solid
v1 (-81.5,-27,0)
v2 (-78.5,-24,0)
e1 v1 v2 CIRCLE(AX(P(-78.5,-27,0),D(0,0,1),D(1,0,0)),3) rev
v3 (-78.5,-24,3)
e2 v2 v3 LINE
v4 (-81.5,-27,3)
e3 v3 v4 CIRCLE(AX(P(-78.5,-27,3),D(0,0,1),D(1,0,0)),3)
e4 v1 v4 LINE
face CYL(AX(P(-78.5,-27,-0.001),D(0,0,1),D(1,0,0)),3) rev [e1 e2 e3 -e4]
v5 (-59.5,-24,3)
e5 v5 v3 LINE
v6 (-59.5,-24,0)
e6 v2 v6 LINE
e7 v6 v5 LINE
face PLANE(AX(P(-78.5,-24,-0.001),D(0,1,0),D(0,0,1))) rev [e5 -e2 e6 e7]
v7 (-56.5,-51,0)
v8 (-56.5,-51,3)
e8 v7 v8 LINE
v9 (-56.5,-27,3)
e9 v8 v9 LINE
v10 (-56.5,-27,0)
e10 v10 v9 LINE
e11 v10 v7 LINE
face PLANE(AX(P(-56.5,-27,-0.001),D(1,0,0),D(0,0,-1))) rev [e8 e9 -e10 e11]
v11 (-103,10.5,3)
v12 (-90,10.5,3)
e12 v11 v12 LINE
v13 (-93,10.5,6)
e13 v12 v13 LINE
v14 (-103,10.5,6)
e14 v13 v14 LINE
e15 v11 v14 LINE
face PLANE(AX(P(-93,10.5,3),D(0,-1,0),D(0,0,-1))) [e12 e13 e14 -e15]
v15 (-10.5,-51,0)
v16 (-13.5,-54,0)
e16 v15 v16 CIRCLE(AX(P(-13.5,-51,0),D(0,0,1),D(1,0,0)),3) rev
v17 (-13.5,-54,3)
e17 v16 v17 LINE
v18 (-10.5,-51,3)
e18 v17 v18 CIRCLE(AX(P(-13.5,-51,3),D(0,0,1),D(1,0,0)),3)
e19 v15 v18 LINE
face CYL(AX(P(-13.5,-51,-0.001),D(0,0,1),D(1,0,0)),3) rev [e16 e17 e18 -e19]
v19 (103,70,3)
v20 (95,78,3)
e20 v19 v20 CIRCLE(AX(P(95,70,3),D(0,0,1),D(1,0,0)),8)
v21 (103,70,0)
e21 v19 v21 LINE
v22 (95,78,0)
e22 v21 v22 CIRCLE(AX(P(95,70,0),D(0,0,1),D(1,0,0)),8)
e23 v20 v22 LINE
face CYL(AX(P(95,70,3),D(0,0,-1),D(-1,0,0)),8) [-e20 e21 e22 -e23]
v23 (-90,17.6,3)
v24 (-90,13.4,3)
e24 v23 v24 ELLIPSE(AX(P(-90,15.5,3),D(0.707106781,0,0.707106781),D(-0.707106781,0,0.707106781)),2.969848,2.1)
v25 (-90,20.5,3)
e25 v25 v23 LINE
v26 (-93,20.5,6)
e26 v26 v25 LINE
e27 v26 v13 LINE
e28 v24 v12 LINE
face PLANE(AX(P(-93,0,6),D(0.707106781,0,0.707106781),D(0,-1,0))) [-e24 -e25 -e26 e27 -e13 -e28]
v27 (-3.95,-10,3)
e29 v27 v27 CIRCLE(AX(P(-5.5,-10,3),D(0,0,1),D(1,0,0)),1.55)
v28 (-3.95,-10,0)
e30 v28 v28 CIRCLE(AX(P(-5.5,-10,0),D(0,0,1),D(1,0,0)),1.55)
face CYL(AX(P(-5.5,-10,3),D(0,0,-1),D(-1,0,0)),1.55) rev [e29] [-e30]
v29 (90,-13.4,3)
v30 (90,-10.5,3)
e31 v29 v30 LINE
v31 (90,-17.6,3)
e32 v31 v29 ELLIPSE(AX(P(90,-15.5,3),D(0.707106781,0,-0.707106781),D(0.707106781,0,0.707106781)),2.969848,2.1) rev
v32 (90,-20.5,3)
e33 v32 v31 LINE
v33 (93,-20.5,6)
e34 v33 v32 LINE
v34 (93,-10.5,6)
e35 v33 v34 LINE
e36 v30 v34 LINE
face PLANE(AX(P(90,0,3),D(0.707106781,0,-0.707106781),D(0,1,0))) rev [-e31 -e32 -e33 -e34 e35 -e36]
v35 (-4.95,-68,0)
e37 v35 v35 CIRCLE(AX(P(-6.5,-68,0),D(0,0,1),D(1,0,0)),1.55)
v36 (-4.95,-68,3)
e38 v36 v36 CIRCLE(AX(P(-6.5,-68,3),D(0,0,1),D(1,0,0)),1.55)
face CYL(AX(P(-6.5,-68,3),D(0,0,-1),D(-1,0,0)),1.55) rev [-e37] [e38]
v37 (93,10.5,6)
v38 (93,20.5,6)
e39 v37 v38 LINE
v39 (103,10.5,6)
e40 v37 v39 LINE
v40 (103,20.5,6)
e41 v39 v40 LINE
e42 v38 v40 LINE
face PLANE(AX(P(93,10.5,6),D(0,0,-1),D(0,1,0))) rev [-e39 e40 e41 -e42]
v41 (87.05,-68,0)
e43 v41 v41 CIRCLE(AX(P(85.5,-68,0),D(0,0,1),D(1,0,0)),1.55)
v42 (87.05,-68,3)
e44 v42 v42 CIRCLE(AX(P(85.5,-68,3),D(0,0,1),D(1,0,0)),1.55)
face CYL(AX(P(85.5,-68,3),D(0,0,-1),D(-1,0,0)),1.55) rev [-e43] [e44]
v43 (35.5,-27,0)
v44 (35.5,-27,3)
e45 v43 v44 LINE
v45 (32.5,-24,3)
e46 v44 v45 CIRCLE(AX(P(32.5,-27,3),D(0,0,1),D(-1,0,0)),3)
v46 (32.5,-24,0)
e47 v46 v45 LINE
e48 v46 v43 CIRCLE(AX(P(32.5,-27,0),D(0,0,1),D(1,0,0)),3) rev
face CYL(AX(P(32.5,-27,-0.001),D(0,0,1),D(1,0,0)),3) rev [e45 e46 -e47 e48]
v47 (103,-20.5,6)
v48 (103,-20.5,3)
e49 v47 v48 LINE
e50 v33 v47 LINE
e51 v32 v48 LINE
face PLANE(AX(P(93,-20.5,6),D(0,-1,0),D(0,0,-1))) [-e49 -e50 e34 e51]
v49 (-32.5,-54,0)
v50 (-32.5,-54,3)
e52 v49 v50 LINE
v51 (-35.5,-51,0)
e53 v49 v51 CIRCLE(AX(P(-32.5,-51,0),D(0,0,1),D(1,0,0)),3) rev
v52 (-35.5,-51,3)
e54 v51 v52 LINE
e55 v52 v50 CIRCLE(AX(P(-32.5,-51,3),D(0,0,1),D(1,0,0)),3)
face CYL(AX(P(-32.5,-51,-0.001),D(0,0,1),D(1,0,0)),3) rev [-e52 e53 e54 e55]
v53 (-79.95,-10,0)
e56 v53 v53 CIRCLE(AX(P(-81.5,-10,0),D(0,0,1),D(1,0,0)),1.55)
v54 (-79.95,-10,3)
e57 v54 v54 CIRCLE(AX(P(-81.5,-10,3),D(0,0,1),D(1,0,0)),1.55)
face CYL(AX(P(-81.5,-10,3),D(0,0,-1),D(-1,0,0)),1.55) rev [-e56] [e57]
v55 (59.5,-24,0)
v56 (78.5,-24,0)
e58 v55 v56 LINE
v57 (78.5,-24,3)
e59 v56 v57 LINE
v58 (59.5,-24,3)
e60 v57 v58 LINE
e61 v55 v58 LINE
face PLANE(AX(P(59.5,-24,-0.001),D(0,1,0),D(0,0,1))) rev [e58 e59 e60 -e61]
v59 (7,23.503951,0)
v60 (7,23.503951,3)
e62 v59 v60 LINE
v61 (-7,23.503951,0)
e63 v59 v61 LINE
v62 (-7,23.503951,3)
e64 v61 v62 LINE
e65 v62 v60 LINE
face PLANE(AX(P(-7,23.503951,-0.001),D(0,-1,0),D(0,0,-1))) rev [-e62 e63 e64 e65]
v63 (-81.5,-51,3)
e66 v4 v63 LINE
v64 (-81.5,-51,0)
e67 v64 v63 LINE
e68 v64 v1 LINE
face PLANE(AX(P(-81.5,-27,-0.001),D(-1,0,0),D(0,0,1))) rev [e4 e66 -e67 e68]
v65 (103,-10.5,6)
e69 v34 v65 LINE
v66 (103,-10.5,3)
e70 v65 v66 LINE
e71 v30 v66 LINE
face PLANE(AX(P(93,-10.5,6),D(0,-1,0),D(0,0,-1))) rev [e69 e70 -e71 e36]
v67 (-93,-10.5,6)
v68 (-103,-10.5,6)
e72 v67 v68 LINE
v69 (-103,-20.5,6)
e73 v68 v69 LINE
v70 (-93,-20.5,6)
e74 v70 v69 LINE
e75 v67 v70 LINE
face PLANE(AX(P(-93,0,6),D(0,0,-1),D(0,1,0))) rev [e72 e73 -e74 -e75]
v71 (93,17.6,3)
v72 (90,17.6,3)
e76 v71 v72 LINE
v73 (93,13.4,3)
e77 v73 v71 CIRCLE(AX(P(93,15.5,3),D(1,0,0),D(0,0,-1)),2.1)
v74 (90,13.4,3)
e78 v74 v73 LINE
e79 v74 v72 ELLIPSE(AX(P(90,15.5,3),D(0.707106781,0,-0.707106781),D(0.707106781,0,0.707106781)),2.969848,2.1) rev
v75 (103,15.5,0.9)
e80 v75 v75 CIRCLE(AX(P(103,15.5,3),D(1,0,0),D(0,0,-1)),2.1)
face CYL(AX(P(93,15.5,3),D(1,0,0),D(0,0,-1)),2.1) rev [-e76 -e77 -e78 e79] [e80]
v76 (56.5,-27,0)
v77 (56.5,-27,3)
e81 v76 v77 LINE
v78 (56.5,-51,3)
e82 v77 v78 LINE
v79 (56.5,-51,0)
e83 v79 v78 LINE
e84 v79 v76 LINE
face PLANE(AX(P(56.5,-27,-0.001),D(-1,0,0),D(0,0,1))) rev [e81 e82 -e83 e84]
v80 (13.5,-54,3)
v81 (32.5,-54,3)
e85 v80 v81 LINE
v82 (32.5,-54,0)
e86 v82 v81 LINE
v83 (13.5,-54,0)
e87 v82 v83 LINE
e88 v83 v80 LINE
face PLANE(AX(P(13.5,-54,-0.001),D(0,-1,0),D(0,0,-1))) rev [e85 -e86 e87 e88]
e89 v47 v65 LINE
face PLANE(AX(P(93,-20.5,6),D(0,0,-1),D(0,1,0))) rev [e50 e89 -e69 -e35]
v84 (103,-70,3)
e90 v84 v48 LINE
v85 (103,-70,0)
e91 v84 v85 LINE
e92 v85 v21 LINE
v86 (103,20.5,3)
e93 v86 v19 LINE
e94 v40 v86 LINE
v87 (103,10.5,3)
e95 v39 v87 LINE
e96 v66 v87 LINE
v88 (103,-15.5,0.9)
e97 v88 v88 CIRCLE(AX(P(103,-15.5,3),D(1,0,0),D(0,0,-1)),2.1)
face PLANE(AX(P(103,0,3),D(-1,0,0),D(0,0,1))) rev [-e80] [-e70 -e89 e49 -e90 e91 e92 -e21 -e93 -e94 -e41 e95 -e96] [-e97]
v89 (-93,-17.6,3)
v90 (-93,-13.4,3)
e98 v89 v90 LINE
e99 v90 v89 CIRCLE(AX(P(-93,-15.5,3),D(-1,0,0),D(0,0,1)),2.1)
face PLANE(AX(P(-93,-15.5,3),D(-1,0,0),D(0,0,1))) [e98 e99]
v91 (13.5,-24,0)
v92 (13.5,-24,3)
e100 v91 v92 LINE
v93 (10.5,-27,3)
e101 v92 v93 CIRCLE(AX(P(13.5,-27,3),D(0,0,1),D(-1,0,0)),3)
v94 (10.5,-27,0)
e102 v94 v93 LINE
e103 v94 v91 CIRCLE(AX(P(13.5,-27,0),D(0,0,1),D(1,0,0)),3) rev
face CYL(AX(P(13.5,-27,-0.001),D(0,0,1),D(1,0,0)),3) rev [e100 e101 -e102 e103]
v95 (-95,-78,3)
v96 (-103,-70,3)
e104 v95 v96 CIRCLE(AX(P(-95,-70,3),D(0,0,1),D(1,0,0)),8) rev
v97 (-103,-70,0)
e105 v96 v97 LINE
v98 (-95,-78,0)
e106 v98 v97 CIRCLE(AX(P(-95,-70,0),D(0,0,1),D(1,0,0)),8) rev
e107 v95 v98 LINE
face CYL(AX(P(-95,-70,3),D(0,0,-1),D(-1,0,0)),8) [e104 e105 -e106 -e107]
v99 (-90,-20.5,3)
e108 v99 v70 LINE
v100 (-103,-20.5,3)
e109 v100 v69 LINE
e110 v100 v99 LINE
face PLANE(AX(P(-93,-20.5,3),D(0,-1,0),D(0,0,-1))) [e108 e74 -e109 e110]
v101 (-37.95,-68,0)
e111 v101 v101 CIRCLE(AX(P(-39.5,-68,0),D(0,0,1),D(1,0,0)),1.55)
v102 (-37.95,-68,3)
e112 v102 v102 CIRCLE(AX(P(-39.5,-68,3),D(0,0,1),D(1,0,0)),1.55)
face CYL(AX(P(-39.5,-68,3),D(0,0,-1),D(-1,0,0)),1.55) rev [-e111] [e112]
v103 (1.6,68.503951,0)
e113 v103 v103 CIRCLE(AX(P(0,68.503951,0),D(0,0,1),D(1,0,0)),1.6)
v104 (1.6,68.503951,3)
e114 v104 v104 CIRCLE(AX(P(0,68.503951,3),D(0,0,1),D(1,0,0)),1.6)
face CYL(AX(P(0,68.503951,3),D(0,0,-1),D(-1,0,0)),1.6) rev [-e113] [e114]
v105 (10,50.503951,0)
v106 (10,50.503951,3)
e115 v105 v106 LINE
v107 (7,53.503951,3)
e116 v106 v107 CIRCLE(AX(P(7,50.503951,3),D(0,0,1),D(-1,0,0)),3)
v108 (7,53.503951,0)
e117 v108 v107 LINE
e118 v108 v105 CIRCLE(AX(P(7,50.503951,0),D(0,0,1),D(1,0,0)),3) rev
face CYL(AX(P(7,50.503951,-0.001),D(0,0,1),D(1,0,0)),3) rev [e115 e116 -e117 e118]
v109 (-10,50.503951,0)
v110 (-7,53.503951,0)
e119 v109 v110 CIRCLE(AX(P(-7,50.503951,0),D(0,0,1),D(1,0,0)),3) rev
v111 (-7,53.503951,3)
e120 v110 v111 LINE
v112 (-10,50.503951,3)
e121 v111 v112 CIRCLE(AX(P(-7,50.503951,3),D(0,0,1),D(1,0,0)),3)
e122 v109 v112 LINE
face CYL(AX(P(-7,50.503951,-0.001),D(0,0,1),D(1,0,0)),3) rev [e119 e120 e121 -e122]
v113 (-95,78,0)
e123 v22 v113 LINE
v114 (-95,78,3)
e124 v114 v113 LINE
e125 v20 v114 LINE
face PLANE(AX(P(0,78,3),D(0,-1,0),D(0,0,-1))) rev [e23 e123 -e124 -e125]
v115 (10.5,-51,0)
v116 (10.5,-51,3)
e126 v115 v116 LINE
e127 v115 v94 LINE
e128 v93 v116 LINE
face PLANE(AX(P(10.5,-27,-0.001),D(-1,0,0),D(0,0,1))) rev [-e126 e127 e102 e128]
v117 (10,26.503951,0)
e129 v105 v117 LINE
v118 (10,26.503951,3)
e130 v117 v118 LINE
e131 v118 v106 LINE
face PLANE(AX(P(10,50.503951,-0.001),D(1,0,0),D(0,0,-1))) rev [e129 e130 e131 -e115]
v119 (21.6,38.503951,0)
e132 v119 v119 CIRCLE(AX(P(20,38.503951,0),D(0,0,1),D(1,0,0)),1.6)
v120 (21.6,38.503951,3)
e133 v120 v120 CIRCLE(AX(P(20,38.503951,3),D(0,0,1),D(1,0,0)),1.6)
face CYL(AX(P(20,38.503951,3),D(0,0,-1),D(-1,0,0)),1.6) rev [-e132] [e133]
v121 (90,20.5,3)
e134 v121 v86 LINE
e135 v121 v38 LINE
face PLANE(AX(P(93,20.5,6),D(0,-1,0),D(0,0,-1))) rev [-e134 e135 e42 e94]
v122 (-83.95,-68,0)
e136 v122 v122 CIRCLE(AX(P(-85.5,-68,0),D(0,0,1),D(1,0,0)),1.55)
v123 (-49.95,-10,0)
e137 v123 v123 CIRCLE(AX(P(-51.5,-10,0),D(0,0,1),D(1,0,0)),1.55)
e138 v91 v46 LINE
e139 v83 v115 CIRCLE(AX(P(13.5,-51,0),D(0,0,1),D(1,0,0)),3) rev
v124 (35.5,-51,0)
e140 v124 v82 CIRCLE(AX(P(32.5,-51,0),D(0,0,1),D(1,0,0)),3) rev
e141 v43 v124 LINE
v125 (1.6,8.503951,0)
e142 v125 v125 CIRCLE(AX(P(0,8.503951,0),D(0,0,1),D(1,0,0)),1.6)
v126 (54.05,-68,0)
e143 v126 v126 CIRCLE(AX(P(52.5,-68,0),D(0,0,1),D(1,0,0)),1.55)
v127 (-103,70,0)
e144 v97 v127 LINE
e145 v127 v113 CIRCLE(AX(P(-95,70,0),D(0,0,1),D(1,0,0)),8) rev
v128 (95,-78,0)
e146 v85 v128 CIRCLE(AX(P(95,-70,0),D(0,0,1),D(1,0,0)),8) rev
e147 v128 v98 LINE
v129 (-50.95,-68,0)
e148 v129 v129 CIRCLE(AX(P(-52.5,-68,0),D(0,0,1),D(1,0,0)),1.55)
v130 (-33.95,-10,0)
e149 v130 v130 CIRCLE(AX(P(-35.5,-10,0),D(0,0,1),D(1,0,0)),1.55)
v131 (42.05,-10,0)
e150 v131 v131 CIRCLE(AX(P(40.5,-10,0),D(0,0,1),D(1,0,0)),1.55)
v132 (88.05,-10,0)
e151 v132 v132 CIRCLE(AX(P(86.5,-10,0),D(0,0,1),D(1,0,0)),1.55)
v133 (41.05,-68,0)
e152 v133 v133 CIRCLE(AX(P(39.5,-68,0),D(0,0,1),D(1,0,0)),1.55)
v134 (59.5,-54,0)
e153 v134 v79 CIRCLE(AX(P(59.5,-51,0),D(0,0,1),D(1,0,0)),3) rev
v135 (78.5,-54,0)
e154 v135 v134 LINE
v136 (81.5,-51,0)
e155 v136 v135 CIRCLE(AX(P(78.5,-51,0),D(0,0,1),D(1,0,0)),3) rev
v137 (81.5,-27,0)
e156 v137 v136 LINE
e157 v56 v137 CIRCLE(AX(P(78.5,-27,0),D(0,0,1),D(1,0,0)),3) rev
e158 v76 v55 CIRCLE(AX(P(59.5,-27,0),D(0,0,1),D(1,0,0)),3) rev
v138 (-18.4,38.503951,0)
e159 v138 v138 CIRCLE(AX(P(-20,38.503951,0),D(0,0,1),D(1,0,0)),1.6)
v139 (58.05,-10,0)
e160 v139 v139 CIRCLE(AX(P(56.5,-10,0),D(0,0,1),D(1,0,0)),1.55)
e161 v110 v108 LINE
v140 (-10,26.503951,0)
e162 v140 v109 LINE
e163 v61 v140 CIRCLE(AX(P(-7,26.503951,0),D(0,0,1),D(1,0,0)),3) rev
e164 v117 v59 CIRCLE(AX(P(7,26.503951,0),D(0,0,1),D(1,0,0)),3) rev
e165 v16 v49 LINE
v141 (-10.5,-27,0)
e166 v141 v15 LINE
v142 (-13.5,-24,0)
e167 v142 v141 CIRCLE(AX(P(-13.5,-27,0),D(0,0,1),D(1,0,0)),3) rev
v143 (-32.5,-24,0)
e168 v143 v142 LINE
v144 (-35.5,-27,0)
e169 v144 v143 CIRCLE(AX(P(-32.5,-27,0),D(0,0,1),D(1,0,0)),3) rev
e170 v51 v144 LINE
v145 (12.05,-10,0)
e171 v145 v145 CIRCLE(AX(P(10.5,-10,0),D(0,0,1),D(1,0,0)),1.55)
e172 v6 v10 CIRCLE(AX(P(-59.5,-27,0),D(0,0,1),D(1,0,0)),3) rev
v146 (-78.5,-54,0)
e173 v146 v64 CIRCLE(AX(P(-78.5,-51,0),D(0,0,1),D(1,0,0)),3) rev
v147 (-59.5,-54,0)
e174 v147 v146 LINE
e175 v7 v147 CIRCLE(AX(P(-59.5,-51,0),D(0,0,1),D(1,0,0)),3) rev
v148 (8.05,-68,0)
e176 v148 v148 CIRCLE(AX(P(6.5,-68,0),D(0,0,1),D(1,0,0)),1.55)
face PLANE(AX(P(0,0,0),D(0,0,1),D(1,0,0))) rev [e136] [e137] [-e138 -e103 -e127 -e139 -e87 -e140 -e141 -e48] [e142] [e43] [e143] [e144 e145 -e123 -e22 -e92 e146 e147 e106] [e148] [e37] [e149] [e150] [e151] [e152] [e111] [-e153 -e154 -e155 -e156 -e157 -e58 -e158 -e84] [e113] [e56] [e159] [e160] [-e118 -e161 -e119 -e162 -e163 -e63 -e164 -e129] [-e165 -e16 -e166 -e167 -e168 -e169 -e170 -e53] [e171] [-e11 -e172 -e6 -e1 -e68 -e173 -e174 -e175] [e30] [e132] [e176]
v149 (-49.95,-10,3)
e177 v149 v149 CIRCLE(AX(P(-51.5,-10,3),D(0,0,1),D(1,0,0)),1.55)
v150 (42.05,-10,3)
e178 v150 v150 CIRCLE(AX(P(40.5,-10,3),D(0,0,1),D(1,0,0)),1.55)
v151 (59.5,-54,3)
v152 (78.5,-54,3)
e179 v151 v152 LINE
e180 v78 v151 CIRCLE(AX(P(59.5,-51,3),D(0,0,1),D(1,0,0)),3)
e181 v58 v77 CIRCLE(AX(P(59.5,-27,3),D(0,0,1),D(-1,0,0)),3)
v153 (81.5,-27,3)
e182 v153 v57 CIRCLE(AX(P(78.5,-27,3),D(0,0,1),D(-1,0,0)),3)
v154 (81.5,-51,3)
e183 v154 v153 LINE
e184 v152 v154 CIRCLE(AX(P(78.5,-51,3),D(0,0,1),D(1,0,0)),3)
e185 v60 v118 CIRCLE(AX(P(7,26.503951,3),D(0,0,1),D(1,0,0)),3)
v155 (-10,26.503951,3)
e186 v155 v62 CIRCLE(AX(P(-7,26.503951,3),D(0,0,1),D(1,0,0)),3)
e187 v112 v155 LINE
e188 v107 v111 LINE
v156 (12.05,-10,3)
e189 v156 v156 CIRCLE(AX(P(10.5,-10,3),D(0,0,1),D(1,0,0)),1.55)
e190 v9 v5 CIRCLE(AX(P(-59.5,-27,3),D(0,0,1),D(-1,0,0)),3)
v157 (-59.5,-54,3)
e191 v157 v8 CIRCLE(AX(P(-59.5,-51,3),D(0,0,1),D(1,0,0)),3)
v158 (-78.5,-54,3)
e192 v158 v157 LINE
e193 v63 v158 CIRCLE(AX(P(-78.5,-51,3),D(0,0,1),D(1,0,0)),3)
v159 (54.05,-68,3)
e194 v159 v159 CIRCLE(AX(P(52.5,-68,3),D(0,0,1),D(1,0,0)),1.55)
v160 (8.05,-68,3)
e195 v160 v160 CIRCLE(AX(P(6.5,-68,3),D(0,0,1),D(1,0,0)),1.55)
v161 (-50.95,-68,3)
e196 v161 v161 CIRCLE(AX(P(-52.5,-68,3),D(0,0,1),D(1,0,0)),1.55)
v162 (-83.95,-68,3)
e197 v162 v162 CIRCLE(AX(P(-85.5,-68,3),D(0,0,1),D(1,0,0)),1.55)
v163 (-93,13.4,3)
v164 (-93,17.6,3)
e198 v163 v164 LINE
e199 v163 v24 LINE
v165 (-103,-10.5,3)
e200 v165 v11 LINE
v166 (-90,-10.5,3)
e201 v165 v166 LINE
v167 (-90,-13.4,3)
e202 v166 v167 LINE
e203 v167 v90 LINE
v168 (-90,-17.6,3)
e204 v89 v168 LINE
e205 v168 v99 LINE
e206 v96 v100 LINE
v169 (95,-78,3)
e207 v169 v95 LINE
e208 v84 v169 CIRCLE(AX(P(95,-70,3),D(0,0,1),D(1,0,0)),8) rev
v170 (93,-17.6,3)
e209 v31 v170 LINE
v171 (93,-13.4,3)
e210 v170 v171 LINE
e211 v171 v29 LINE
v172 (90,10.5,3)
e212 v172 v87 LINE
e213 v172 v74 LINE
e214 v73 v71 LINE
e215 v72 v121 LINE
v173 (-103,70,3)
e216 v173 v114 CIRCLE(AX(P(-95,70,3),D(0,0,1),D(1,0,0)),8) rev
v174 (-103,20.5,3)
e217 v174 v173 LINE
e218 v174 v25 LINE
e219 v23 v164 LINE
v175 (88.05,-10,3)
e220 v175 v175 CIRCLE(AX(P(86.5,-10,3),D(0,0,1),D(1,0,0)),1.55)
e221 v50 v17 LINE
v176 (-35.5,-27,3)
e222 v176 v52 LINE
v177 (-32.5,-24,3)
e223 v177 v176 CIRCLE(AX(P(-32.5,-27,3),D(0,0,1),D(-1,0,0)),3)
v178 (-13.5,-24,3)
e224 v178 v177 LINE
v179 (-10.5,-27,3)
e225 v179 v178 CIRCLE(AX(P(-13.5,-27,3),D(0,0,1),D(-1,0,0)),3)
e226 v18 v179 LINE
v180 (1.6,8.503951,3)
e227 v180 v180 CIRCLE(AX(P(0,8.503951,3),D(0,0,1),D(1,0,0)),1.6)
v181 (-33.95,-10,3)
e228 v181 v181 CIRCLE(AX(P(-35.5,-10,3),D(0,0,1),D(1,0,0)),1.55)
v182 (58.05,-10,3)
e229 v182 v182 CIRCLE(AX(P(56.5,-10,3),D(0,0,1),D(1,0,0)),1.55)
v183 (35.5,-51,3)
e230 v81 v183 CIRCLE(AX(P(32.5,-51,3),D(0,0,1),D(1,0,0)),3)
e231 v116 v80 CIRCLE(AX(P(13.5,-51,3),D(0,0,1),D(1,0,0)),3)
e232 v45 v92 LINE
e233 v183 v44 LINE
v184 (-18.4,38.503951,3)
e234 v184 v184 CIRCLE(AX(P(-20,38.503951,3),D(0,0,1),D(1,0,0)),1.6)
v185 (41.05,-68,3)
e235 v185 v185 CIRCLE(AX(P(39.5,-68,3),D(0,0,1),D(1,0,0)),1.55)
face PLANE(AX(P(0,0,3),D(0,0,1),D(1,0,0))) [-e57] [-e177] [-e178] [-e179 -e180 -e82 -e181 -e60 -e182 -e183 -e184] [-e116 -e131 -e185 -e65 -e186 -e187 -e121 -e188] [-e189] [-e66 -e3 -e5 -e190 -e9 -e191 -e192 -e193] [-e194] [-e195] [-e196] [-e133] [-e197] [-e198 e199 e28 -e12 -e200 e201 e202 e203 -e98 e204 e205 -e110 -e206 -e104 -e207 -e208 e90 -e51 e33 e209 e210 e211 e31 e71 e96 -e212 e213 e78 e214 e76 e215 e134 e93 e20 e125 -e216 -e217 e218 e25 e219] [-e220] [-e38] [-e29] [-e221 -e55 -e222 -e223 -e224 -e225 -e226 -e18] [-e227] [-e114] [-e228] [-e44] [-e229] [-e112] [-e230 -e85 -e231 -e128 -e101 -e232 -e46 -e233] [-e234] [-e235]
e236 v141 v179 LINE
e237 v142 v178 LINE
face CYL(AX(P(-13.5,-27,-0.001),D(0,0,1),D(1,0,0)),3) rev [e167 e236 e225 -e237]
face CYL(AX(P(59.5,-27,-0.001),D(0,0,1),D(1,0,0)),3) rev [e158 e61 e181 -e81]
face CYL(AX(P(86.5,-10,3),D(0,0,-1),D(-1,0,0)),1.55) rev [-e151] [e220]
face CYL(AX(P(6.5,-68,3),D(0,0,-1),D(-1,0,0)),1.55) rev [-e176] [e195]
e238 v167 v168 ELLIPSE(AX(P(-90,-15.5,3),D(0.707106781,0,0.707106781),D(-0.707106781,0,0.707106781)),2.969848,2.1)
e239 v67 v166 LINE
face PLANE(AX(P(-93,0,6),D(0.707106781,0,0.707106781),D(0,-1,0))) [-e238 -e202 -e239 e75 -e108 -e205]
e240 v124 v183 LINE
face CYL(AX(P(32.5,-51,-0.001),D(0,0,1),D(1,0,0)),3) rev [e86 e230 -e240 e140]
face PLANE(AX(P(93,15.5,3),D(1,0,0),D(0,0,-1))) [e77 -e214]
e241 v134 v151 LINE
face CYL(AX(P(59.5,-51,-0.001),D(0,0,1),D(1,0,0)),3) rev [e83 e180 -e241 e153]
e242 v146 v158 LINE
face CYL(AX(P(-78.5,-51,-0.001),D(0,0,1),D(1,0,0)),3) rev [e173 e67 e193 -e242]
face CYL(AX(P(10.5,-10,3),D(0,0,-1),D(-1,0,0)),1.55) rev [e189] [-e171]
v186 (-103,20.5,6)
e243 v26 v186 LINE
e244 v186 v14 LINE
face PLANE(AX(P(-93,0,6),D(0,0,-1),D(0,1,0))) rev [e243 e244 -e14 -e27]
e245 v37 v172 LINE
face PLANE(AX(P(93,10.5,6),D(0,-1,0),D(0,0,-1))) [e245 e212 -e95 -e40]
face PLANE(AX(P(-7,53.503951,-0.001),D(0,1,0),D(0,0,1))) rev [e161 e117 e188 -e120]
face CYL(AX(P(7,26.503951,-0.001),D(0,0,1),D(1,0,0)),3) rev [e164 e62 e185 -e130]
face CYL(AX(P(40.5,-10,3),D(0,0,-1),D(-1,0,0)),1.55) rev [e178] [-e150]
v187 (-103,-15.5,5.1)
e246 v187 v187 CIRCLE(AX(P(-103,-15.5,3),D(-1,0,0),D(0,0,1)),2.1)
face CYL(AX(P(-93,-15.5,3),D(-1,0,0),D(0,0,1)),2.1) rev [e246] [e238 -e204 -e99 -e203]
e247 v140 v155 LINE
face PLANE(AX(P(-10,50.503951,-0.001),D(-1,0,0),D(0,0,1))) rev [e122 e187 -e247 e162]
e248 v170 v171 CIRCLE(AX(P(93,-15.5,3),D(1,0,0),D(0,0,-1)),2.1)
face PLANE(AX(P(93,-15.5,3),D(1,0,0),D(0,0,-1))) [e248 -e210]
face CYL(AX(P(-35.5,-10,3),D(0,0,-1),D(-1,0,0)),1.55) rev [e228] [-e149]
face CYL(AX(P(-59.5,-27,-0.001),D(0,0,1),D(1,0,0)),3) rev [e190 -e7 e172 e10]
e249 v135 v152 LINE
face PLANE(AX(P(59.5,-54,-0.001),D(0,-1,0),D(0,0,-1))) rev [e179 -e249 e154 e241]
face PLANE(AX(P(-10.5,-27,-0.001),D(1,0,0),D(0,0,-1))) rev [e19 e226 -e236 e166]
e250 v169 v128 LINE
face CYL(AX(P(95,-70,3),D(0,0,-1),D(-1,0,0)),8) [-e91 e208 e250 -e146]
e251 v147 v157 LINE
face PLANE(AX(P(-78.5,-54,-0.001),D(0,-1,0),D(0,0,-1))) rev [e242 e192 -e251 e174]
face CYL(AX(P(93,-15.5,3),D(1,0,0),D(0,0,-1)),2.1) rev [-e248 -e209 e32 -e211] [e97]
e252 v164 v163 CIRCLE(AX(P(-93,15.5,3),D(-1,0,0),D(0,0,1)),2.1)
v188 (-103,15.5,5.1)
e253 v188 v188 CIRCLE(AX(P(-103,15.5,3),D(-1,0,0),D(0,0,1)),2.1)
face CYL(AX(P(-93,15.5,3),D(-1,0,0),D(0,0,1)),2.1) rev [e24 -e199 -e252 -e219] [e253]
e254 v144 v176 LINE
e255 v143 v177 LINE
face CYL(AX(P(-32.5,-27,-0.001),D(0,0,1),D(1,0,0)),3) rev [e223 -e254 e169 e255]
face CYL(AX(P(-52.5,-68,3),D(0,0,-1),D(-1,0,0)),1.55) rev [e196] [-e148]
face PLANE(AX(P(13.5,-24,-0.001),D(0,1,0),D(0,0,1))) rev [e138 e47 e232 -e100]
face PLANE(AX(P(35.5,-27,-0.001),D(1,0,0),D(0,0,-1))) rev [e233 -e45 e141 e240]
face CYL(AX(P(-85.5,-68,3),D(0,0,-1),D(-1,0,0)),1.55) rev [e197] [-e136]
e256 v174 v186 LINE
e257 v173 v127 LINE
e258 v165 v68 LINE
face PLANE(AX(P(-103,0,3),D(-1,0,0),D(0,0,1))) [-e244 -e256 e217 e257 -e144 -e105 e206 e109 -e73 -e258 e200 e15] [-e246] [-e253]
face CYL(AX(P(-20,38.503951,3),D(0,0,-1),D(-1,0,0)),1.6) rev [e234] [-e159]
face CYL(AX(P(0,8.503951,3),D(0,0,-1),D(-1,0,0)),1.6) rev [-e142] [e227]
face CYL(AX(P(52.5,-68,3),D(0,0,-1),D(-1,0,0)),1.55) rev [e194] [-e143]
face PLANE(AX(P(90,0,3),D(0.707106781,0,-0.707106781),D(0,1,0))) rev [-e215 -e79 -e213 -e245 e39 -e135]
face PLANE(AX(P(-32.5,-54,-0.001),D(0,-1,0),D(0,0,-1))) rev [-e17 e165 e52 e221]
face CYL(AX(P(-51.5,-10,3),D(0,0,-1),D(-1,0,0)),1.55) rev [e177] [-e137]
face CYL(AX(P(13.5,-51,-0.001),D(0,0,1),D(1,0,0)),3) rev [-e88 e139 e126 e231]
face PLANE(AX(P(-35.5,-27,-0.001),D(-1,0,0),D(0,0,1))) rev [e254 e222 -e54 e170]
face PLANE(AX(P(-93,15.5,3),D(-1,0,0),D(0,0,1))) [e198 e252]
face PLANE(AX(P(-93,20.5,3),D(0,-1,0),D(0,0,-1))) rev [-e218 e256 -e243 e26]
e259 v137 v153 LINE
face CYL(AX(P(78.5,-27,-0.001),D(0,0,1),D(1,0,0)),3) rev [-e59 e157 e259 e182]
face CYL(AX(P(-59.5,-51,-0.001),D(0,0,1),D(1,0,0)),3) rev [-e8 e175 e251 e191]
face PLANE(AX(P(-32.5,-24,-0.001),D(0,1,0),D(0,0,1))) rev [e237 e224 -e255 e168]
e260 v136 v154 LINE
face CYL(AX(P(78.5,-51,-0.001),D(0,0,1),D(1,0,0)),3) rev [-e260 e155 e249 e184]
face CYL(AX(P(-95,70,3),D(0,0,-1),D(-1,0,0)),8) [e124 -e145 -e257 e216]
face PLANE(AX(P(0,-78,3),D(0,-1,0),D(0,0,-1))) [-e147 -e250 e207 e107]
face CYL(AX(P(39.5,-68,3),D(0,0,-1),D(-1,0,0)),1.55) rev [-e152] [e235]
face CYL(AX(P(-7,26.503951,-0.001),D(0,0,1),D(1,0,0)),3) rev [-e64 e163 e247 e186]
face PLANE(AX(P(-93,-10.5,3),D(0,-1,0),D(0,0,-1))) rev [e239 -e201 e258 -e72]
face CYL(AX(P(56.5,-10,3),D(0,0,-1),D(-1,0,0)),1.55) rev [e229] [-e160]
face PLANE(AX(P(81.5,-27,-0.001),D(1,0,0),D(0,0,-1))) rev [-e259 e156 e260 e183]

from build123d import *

# Parameters (mm, degrees)
SKETCH1_R           = 1.55
SKETCH1_R_2         = 1.6
BOSS_EXTRUDE1_DEPTH = 3
CUT_EXTRUDE3_REACH  = 131.236
SKETCH3_W           = 10
SKETCH3_H           = 6
BOSS_EXTRUDE2_DEPTH = 10
BOSS_EXTRUDE3_START = -206
SKETCH3_4_W         = 10
SKETCH3_4_H         = 6
BOSS_EXTRUDE3_DEPTH = 10
SKETCH3_6_R         = 2.1
CUT_EXTRUDE4_DEPTH  = 10
CUT_EXTRUDE5_START  = -196
SKETCH3_7_R         = 2.1
CUT_EXTRUDE5_DEPTH  = 10
CHAMFER1_SIZE       = 3


with BuildPart() as part:
    # Sketch1 → Boss-Extrude1 (new body)
    with BuildSketch(Plane(origin=(0, 0, 0), x_dir=(0, 1, 0), z_dir=(0, 0, 1))):
        with BuildLine():
            Line((-70, -103), (70, -103))
            ThreePointArc((70, -103), (75.656854249, -100.656854249), (78, -95))
            Line((78, -95), (78, 95))
            ThreePointArc((78, 95), (75.656854249, 100.656854249), (70, 103))
            Line((70, 103), (-70, 103))
            ThreePointArc((-70, 103), (-75.656854249, 100.656854249), (-78, 95))
            Line((-78, 95), (-78, -95))
            ThreePointArc((-78, -95), (-75.656854249, -100.656854249), (-70, -103))
        make_face()
        with Locations(Location((-68, -52.5, 0), (0, 0, 270))):
            Circle(SKETCH1_R, mode=Mode.SUBTRACT)
        with Locations(Location((-68, -85.5, 0), (0, 0, 270))):
            Circle(SKETCH1_R, mode=Mode.SUBTRACT)
        with Locations(Location((-10, -86.5, 0), (0, 0, 270))):
            Circle(SKETCH1_R, mode=Mode.SUBTRACT)
        with Locations(Location((-10, -56.5, 0), (0, 0, 270))):
            Circle(SKETCH1_R, mode=Mode.SUBTRACT)
        with Locations(Location((-68, -6.5, 0), (0, 0, 270))):
            Circle(SKETCH1_R, mode=Mode.SUBTRACT)
        with Locations(Location((-68, -39.5, 0), (0, 0, 270))):
            Circle(SKETCH1_R, mode=Mode.SUBTRACT)
        with Locations(Location((-10, -40.5, 0), (0, 0, 270))):
            Circle(SKETCH1_R, mode=Mode.SUBTRACT)
        with Locations(Location((-10, -10.5, 0), (0, 0, 270))):
            Circle(SKETCH1_R, mode=Mode.SUBTRACT)
        with Locations(Location((-68, 39.5, 0), (0, 0, 270))):
            Circle(SKETCH1_R, mode=Mode.SUBTRACT)
        with Locations(Location((-68, 6.5, 0), (0, 0, 270))):
            Circle(SKETCH1_R, mode=Mode.SUBTRACT)
        with Locations(Location((-10, 5.5, 0), (0, 0, 270))):
            Circle(SKETCH1_R, mode=Mode.SUBTRACT)
        with Locations(Location((-10, 35.5, 0), (0, 0, 270))):
            Circle(SKETCH1_R, mode=Mode.SUBTRACT)
        with Locations(Location((-68, 85.5, 0), (0, 0, 270))):
            Circle(SKETCH1_R, mode=Mode.SUBTRACT)
        with Locations(Location((-68, 52.5, 0), (0, 0, 270))):
            Circle(SKETCH1_R, mode=Mode.SUBTRACT)
        with Locations(Location((-10, 51.5, 0), (0, 0, 270))):
            Circle(SKETCH1_R, mode=Mode.SUBTRACT)
        with Locations(Location((-10, 81.5, 0), (0, 0, 270))):
            Circle(SKETCH1_R, mode=Mode.SUBTRACT)
        with Locations(Location((8.503950992, 0, 0), (0, 0, 270))):
            Circle(SKETCH1_R_2, mode=Mode.SUBTRACT)
        with Locations(Location((38.503950992, 20, 0), (0, 0, 270))):
            Circle(SKETCH1_R_2, mode=Mode.SUBTRACT)
        with Locations(Location((68.503950992, 0, 0), (0, 0, 270))):
            Circle(SKETCH1_R_2, mode=Mode.SUBTRACT)
        with Locations(Location((38.503950992, -20, 0), (0, 0, 270))):
            Circle(SKETCH1_R_2, mode=Mode.SUBTRACT)
    extrude(amount=BOSS_EXTRUDE1_DEPTH)

    # Sketch4 → Cut-Extrude3 (cut, up to next)
    with BuildSketch(Plane.XY.offset(3), mode=Mode.PRIVATE) as cut_extrude3_sk1:
        with BuildLine():
            Line((-78.5, -24), (-59.5, -24))
            ThreePointArc((-59.5, -24), (-57.378679656, -24.878679656), (-56.5, -27))
            Line((-56.5, -27), (-56.5, -51))
            ThreePointArc((-56.5, -51), (-57.378679656, -53.121320344), (-59.5, -54))
            Line((-59.5, -54), (-78.5, -54))
            ThreePointArc((-78.5, -54), (-80.621320344, -53.121320344), (-81.5, -51))
            Line((-81.5, -51), (-81.5, -27))
            ThreePointArc((-81.5, -27), (-80.621320344, -24.878679656), (-78.5, -24))
        make_face()
    cut_extrude3_tool1 = extrude(cut_extrude3_sk1.sketch, amount=-CUT_EXTRUDE3_REACH, mode=Mode.PRIVATE) & part.part
    # Sketch4 → Cut-Extrude3 (cut, up to next)
    with BuildSketch(Plane.XY.offset(3), mode=Mode.PRIVATE) as cut_extrude3_sk2:
        with BuildLine():
            Line((-35.5, -27), (-35.5, -51))
            ThreePointArc((-35.5, -51), (-34.621320344, -53.121320344), (-32.5, -54))
            Line((-32.5, -54), (-13.5, -54))
            ThreePointArc((-13.5, -54), (-11.378679656, -53.121320344), (-10.5, -51))
            Line((-10.5, -51), (-10.5, -27))
            ThreePointArc((-10.5, -27), (-11.378679656, -24.878679656), (-13.5, -24))
            Line((-13.5, -24), (-32.5, -24))
            ThreePointArc((-32.5, -24), (-34.621320344, -24.878679656), (-35.5, -27))
        make_face()
    cut_extrude3_tool2 = extrude(cut_extrude3_sk2.sketch, amount=-CUT_EXTRUDE3_REACH, mode=Mode.PRIVATE) & part.part
    # Sketch4 → Cut-Extrude3 (cut, up to next)
    with BuildSketch(Plane.XY.offset(3), mode=Mode.PRIVATE) as cut_extrude3_sk3:
        with BuildLine():
            Line((10.5, -27), (10.5, -51))
            ThreePointArc((10.5, -51), (11.378679656, -53.121320344), (13.5, -54))
            Line((13.5, -54), (32.5, -54))
            ThreePointArc((32.5, -54), (34.621320344, -53.121320344), (35.5, -51))
            Line((35.5, -51), (35.5, -27))
            ThreePointArc((35.5, -27), (34.621320344, -24.878679656), (32.5, -24))
            Line((32.5, -24), (13.5, -24))
            ThreePointArc((13.5, -24), (11.378679656, -24.878679656), (10.5, -27))
        make_face()
    cut_extrude3_tool3 = extrude(cut_extrude3_sk3.sketch, amount=-CUT_EXTRUDE3_REACH, mode=Mode.PRIVATE) & part.part
    # Sketch4 → Cut-Extrude3 (cut, up to next)
    with BuildSketch(Plane.XY.offset(3), mode=Mode.PRIVATE) as cut_extrude3_sk4:
        with BuildLine():
            Line((56.5, -27), (56.5, -51))
            ThreePointArc((56.5, -51), (57.378679656, -53.121320344), (59.5, -54))
            Line((59.5, -54), (78.5, -54))
            ThreePointArc((78.5, -54), (80.621320344, -53.121320344), (81.5, -51))
            Line((81.5, -51), (81.5, -27))
            ThreePointArc((81.5, -27), (80.621320344, -24.878679656), (78.5, -24))
            Line((78.5, -24), (59.5, -24))
            ThreePointArc((59.5, -24), (57.378679656, -24.878679656), (56.5, -27))
        make_face()
    cut_extrude3_tool4 = extrude(cut_extrude3_sk4.sketch, amount=-CUT_EXTRUDE3_REACH, mode=Mode.PRIVATE) & part.part
    # Sketch4 → Cut-Extrude3 (cut, up to next)
    with BuildSketch(Plane.XY.offset(3), mode=Mode.PRIVATE) as cut_extrude3_sk5:
        with BuildLine():
            Line((-7, 53.503950992), (7, 53.503950992))
            ThreePointArc((7, 53.503950992), (9.121320344, 52.625271335), (10, 50.503950992))
            Line((10, 50.503950992), (10, 26.503950992))
            ThreePointArc((10, 26.503950992), (9.121320344, 24.382630648), (7, 23.503950992))
            Line((7, 23.503950992), (-7, 23.503950992))
            ThreePointArc((-7, 23.503950992), (-9.121320344, 24.382630648), (-10, 26.503950992))
            Line((-10, 26.503950992), (-10, 50.503950992))
            ThreePointArc((-10, 50.503950992), (-9.121320344, 52.625271335), (-7, 53.503950992))
        make_face()
    cut_extrude3_tool5 = extrude(cut_extrude3_sk5.sketch, amount=-CUT_EXTRUDE3_REACH, mode=Mode.PRIVATE) & part.part
    add(cut_extrude3_tool1.solids().sort_by_distance((-69, -39, 3))[0], mode=Mode.SUBTRACT)
    add(cut_extrude3_tool2.solids().sort_by_distance((-23, -39, 3))[0], mode=Mode.SUBTRACT)
    add(cut_extrude3_tool3.solids().sort_by_distance((23, -39, 3))[0], mode=Mode.SUBTRACT)
    add(cut_extrude3_tool4.solids().sort_by_distance((69, -39, 3))[0], mode=Mode.SUBTRACT)
    add(cut_extrude3_tool5.solids().sort_by_distance((0, 38.503951, 3))[0], mode=Mode.SUBTRACT)

    # Sketch3 → Boss-Extrude2 (add)
    with BuildSketch(Plane.YZ.offset(103)):
        with Locations((-15.5, 3)):
            Rectangle(SKETCH3_W, SKETCH3_H)
        with Locations((15.5, 3)):
            Rectangle(SKETCH3_W, SKETCH3_H)
    extrude(amount=-BOSS_EXTRUDE2_DEPTH)

    # Sketch3<4> → Boss-Extrude3 (add)
    with BuildSketch(Plane.YZ.offset(103).offset(BOSS_EXTRUDE3_START)):
        with Locations((-15.5, 3)):
            Rectangle(SKETCH3_4_W, SKETCH3_4_H)
        with Locations((15.5, 3)):
            Rectangle(SKETCH3_4_W, SKETCH3_4_H)
    extrude(amount=BOSS_EXTRUDE3_DEPTH)

    # Sketch3<6> → Cut-Extrude4 (cut)
    with BuildSketch(Plane.YZ.offset(103)):
        with Locations(Location((-15.5, 3, 0), (0, 0, 270))):
            Circle(SKETCH3_6_R)
        with Locations(Location((15.5, 3, 0), (0, 0, 270))):
            Circle(SKETCH3_6_R)
    extrude(amount=-CUT_EXTRUDE4_DEPTH, mode=Mode.SUBTRACT)

    # Sketch3<7> → Cut-Extrude5 (cut)
    with BuildSketch(Plane.YZ.offset(103).offset(CUT_EXTRUDE5_START)):
        with Locations(Location((-15.5, 3, 0), (0, 0, 270))):
            Circle(SKETCH3_7_R)
        with Locations(Location((15.5, 3, 0), (0, 0, 270))):
            Circle(SKETCH3_7_R)
    extrude(amount=-CUT_EXTRUDE5_DEPTH, mode=Mode.SUBTRACT)

    # Chamfer1
    # the kernel refuses this chamfer: 3 mm, written as the material it adds along each edge
    with BuildSketch(Plane(origin=(93, -9.884951036, 3), x_dir=(-0.9996219169112968, 0, -0.027495876610586334), z_dir=(0, -1, 0))) as chamfer1_piece_1_section:
        Polygon((CHAMFER1_SIZE * 0.999621916911, -CHAMFER1_SIZE * 0.0274958766106), (-CHAMFER1_SIZE * 0.0274958766106, -CHAMFER1_SIZE * 0.999621916911), (0, 0), align=None)
    chamfer1_piece_1 = extrude(amount=10.615048964, mode=Mode.PRIVATE)
    chamfer1_piece_1 = split(chamfer1_piece_1, bisect_by=Plane(origin=(90.522066824, -10.5, 3.477933176), z_dir=(0, -1, 0)), keep=Keep.TOP, mode=Mode.PRIVATE)
    chamfer1_piece_1 = chamfer1_piece_1 - Plane(origin=(90.522066824, -15.5, 3), x_dir=(0, 0, -1), z_dir=(1, 0, 0)) * Cylinder(2.1, 34, mode=Mode.PRIVATE)
    add(chamfer1_piece_1)
    with BuildSketch(Plane(origin=(93, 21.115048964, 3), x_dir=(-0.9996219169112968, 0, -0.027495876610586334), z_dir=(0, -1, 0))) as chamfer1_piece_2_section:
        Polygon((CHAMFER1_SIZE * 0.999621916911, -CHAMFER1_SIZE * 0.0274958766106), (-CHAMFER1_SIZE * 0.0274958766106, -CHAMFER1_SIZE * 0.999621916911), (0, 0), align=None)
    chamfer1_piece_2 = extrude(amount=10.615048964, mode=Mode.PRIVATE)
    chamfer1_piece_2 = split(chamfer1_piece_2, bisect_by=Plane(origin=(90.522066824, 20.5, 3.477933176), z_dir=(0, -1, 0)), keep=Keep.TOP, mode=Mode.PRIVATE)
    chamfer1_piece_2 = chamfer1_piece_2 - Plane(origin=(90.522066824, 15.5, 3), x_dir=(0, 0, -1), z_dir=(1, 0, 0)) * Cylinder(2.1, 34, mode=Mode.PRIVATE)
    add(chamfer1_piece_2)
    with BuildSketch(Plane(origin=(-93, -9.884951036, 3), x_dir=(0.9996219169112968, 0, -0.027495876610586334), z_dir=(0, -1, 0))) as chamfer1_piece_3_section:
        Polygon((CHAMFER1_SIZE * 0.999621916911, CHAMFER1_SIZE * 0.0274958766106), (-CHAMFER1_SIZE * 0.0274958766106, CHAMFER1_SIZE * 0.999621916911), (0, 0), align=None)
    chamfer1_piece_3 = extrude(amount=10.615048964, mode=Mode.PRIVATE)
    chamfer1_piece_3 = split(chamfer1_piece_3, bisect_by=Plane(origin=(-90.522066824, -10.5, 3.477933176), z_dir=(0, -1, 0)), keep=Keep.TOP, mode=Mode.PRIVATE)
    chamfer1_piece_3 = chamfer1_piece_3 - Plane(origin=(-90.522066824, -15.5, 3), x_dir=(0, 0, -1), z_dir=(1, 0, 0)) * Cylinder(2.1, 34, mode=Mode.PRIVATE)
    add(chamfer1_piece_3)
    with BuildSketch(Plane(origin=(-93, 21.115048964, 3), x_dir=(0.9996219169112968, 0, -0.027495876610586334), z_dir=(0, -1, 0))) as chamfer1_piece_4_section:
        Polygon((CHAMFER1_SIZE * 0.999621916911, CHAMFER1_SIZE * 0.0274958766106), (-CHAMFER1_SIZE * 0.0274958766106, CHAMFER1_SIZE * 0.999621916911), (0, 0), align=None)
    chamfer1_piece_4 = extrude(amount=10.615048964, mode=Mode.PRIVATE)
    chamfer1_piece_4 = split(chamfer1_piece_4, bisect_by=Plane(origin=(-90.522066824, 20.5, 3.477933176), z_dir=(0, -1, 0)), keep=Keep.TOP, mode=Mode.PRIVATE)
    chamfer1_piece_4 = chamfer1_piece_4 - Plane(origin=(-90.522066824, 15.5, 3), x_dir=(0, 0, -1), z_dir=(1, 0, 0)) * Cylinder(2.1, 34, mode=Mode.PRIVATE)
    add(chamfer1_piece_4)


solid = part.part
